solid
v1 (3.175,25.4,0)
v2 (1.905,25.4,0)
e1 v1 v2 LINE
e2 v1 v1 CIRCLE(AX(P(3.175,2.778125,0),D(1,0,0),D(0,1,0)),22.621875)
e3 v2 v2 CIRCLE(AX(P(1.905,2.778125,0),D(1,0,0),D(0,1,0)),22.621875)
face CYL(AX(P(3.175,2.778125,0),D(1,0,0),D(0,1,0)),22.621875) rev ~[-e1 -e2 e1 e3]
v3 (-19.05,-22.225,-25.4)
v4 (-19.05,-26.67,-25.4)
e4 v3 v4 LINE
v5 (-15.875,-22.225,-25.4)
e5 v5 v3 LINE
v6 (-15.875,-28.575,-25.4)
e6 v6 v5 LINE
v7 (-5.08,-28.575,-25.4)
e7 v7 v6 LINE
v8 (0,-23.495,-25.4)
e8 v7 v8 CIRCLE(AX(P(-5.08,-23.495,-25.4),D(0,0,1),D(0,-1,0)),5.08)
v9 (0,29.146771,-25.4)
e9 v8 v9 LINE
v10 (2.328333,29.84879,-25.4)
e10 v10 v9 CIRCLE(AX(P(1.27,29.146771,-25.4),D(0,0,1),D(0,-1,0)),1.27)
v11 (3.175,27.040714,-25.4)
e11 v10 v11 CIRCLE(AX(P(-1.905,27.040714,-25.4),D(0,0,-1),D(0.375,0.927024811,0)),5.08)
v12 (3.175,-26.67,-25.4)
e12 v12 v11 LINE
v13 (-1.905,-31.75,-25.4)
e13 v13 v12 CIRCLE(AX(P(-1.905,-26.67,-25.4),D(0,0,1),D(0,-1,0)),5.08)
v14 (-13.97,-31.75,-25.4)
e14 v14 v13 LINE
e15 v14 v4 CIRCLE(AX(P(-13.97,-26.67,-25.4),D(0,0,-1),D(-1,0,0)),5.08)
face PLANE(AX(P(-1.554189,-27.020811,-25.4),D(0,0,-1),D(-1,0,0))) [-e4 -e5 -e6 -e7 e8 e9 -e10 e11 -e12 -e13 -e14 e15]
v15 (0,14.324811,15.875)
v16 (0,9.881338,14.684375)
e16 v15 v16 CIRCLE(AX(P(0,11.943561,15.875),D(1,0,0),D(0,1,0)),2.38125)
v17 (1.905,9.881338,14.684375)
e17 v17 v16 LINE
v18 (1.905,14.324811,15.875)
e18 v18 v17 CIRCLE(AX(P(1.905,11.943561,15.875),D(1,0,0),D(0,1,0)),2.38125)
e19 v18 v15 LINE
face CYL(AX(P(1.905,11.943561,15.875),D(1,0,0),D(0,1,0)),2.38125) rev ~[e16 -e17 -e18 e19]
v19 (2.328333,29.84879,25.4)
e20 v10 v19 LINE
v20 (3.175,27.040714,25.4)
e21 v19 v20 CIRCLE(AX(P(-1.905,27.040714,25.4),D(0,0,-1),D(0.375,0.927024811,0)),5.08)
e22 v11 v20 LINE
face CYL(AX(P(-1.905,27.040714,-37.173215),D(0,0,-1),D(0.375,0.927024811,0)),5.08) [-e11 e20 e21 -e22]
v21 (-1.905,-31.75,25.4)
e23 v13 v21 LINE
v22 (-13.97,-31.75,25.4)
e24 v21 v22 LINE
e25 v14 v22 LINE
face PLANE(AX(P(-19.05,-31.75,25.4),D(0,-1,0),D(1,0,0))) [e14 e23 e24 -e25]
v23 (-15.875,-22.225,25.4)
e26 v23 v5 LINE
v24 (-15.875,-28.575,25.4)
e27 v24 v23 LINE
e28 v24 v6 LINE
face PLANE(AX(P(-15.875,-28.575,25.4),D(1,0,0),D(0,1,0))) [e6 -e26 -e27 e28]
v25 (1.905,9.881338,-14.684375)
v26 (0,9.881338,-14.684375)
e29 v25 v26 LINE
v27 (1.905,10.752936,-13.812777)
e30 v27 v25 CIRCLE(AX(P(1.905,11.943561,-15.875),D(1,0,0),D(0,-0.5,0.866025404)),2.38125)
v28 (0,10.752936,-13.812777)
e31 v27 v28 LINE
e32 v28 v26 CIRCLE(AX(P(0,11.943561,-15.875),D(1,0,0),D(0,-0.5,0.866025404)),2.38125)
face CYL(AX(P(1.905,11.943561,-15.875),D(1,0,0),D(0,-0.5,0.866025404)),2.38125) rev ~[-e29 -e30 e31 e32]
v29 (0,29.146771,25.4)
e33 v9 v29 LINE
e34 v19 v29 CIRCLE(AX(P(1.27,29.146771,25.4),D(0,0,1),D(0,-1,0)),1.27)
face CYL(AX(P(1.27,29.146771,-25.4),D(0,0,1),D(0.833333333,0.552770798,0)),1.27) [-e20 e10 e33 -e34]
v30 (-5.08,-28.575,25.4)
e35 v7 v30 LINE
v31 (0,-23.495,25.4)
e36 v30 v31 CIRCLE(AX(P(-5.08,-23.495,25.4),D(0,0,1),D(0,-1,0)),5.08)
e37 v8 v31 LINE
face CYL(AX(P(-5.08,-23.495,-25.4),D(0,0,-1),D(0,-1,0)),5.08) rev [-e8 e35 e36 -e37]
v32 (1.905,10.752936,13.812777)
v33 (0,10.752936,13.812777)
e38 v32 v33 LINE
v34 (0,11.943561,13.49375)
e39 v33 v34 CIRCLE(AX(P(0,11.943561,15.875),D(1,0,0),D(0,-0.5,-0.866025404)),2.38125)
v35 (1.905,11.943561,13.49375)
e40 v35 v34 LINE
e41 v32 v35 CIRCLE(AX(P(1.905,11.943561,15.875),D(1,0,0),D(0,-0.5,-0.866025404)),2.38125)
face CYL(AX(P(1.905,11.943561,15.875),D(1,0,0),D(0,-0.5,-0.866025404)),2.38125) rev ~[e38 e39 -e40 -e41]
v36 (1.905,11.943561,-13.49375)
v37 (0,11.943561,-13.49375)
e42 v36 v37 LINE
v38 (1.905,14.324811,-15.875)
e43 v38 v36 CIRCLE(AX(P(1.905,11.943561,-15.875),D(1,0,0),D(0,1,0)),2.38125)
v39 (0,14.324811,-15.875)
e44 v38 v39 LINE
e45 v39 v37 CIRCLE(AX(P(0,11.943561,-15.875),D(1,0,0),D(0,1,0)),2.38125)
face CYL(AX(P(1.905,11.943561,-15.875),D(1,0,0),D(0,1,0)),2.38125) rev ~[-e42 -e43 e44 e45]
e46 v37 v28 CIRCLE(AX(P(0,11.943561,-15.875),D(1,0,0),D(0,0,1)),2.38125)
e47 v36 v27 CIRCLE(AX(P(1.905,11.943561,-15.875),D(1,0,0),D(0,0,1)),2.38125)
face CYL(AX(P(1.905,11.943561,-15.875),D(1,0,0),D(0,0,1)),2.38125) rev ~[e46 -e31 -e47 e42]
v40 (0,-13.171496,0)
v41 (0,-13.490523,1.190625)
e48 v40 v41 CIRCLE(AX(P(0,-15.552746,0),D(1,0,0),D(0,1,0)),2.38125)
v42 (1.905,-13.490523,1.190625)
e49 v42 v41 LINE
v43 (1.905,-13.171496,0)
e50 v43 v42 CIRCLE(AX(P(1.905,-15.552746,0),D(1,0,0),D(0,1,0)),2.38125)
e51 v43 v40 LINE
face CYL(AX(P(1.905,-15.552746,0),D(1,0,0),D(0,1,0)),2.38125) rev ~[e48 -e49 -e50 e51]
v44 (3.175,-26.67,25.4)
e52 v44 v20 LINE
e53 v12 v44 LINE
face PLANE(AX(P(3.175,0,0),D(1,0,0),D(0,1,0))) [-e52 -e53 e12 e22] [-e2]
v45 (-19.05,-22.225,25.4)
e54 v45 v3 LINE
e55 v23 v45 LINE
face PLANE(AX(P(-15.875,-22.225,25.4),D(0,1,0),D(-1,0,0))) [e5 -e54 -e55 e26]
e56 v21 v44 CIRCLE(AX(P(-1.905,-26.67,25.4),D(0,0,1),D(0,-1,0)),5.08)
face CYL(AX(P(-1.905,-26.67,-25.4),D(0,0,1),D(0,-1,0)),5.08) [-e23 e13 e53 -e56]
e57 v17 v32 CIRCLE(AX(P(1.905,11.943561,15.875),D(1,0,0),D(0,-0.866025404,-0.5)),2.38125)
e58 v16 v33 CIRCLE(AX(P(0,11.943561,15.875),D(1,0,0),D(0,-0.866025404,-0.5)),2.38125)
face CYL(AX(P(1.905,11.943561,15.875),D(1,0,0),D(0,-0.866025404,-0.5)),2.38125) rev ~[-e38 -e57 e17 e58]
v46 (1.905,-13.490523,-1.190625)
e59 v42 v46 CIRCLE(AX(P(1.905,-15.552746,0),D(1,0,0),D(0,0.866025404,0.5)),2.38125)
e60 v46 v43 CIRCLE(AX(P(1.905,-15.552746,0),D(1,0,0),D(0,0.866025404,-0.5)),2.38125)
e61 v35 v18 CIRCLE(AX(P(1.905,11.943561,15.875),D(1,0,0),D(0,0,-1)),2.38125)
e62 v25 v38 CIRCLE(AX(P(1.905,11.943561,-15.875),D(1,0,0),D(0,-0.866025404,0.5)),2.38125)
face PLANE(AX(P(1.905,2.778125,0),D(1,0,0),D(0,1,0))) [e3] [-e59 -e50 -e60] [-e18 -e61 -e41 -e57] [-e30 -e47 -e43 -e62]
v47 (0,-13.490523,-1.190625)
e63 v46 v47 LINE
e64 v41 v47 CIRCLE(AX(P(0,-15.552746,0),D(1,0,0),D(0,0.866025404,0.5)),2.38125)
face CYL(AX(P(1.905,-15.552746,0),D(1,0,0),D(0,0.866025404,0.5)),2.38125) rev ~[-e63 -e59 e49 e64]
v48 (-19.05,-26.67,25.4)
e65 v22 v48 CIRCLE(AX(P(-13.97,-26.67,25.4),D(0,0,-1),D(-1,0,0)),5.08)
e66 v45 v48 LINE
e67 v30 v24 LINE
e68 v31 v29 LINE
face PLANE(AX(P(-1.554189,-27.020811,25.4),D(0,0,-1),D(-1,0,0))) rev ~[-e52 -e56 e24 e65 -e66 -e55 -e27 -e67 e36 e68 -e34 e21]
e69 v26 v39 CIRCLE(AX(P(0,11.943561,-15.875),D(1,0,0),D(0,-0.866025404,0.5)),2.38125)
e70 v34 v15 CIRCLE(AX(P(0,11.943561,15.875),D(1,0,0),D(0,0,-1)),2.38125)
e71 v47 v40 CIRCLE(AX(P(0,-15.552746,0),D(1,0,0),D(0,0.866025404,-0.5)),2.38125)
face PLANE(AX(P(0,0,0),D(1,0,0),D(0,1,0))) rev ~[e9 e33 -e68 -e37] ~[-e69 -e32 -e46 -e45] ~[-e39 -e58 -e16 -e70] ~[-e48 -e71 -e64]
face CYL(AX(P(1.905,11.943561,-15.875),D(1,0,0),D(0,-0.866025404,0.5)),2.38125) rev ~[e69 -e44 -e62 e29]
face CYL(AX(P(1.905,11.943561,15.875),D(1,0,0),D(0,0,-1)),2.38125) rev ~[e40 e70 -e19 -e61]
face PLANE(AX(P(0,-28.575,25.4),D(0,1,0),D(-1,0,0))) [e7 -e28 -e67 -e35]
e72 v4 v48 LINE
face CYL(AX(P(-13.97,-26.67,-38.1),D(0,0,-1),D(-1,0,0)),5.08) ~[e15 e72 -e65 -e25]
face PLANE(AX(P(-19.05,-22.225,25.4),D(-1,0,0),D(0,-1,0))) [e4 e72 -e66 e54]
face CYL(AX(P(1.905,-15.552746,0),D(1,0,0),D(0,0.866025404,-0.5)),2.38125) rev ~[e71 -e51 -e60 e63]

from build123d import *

# Parameters (mm, degrees)
F0_W        = 63.5
F0_H        = 50.8
F1_DEPTH    = 3.175
F2_R        = 22.621875
F3_DEPTH    = 1.27
F5_DEPTH    = 25.4
F7_DEPTH    = 50.8
F8_T1_DEPTH = 50.8
F8_T3_DEPTH = 74.3464301965
F8_T5_DEPTH = 76.2
F9_R        = 5.08
F10_R       = 1.27


# Not quite as in the source:
# - a fillet or chamfer that OpenCascade refuses, or shapes differently, is made with other operations: its cross-section is extruded or revolved along the edge and cut away or added


with BuildPart() as f1:
    # F0 (on Right) → F1 (new body)
    with BuildSketch(Plane.YZ):
        Rectangle(F0_W, F0_H)
    extrude(amount=F1_DEPTH)

    # F2 (on face) → F3 (cut)
    with BuildSketch(Plane.YZ.offset(3.175)):
        with Locations((2.778125, 0)):
            Circle(F2_R)
    extrude(amount=-F3_DEPTH, mode=Mode.SUBTRACT)

    # F4 (on face) → F5 (cut)
    with BuildSketch(Plane.YZ.offset(1.905)):
        with BuildLine():
            ThreePointArc((14.3248105234, 15.875), (11.3272476722, 18.1751108739), (9.8813375306, 14.684375))
            Line((9.8813375306, 14.684375), (11.9435605234, 15.875))
            Line((11.9435605234, 15.875), (11.9435605234, 13.49375))
            ThreePointArc((11.9435605234, 13.49375), (13.6273585461, 14.1912019773), (14.3248105234, 15.875))
        make_face()
        with BuildLine():
            Line((-15.5527460468, 0), (-13.490523054, 1.190625))
            ThreePointArc((-13.490523054, 1.190625), (-17.9339960468, 0), (-13.490523054, -1.190625))
            Line((-13.490523054, -1.190625), (-15.5527460468, 0))
        make_face()
        with BuildLine():
            ThreePointArc((-13.490523054, -1.190625), (-13.2526351729, -0.6163128512), (-13.1714960468, 0))
            Line((-13.1714960468, 0), (-15.5527460468, 0))
            Line((-15.5527460468, 0), (-13.490523054, -1.190625))
        make_face()
        with BuildLine():
            Line((-15.5527460468, 0), (-13.1714960468, 0))
            ThreePointArc((-13.1714960468, 0), (-13.2526351729, 0.6163128512), (-13.490523054, 1.190625))
            Line((-13.490523054, 1.190625), (-15.5527460468, 0))
        make_face()
        with BuildLine():
            ThreePointArc((10.7529355234, -13.8127770072), (10.2597625007, -14.1912019773), (9.8813375306, -14.684375))
            Line((9.8813375306, -14.684375), (11.9435605234, -15.875))
            Line((11.9435605234, -15.875), (10.7529355234, -13.8127770072))
        make_face()
        with BuildLine():
            Line((11.9435605234, 15.875), (10.7529355234, 13.8127770072))
            ThreePointArc((10.7529355234, 13.8127770072), (11.3272476722, 13.5748891261), (11.9435605234, 13.49375))
            Line((11.9435605234, 13.49375), (11.9435605234, 15.875))
        make_face()
        with BuildLine():
            Line((11.9435605234, 15.875), (9.8813375306, 14.684375))
            ThreePointArc((9.8813375306, 14.684375), (10.2597625007, 14.1912019773), (10.7529355234, 13.8127770072))
            Line((10.7529355234, 13.8127770072), (11.9435605234, 15.875))
        make_face()
        with BuildLine():
            Line((11.9435605234, -15.875), (9.8813375306, -14.684375))
            ThreePointArc((9.8813375306, -14.684375), (11.3272476722, -18.1751108739), (14.3248105234, -15.875))
            ThreePointArc((14.3248105234, -15.875), (13.6273585461, -14.1912019773), (11.9435605234, -13.49375))
            Line((11.9435605234, -13.49375), (11.9435605234, -15.875))
        make_face()
        with BuildLine():
            ThreePointArc((11.9435605234, -13.49375), (11.3272476722, -13.5748891261), (10.7529355234, -13.8127770072))
            Line((10.7529355234, -13.8127770072), (11.9435605234, -15.875))
            Line((11.9435605234, -15.875), (11.9435605234, -13.49375))
        make_face()
    extrude(amount=-F5_DEPTH, mode=Mode.SUBTRACT)

    # F6 (on face) → F7 (join, through all)
    with BuildSketch(Plane.XY.offset(25.4)):
        Polygon((-19.05, -31.75), (0, -31.75), (0, -28.575), (-15.875, -28.575), (-15.875, -22.225), (-19.05, -22.225), align=None)
    extrude(amount=-F7_DEPTH)

    # F8: fillet of radius 5.08 on 3 edges, made by hand

    # F8_s2 → F8_t1 (join)
    with BuildSketch(Plane.XY.offset(-25.4)):
        with BuildLine():
            ThreePointArc((-5.08, -28.575), (-1.4878975516, -27.0871024484), (0, -23.495))
            Line((0, -23.495), (0, -28.575))
            Line((0, -28.575), (-5.08, -28.575))
        make_face()
    extrude(amount=F8_T1_DEPTH)

    # F8_s4 → F8_t3 (cut)
    with BuildSketch(Plane.XY.offset(-37.1732150983)):
        with BuildLine():
            ThreePointArc((0, 31.75), (2.3071134838, 29.8805202921), (3.175, 27.0407139607))
            Line((3.175, 27.0407139607), (3.175, 31.75))
            Line((3.175, 31.75), (0, 31.75))
        make_face()
    extrude(amount=F8_T3_DEPTH, mode=Mode.SUBTRACT)

    # F8_s6 → F8_t5 (cut)
    with BuildSketch(Plane.XY.offset(-38.1)):
        with BuildLine():
            ThreePointArc((-19.05, -26.67), (-17.5621024484, -30.2621024484), (-13.97, -31.75))
            Line((-13.97, -31.75), (-19.05, -31.75))
            Line((-19.05, -31.75), (-19.05, -26.67))
        make_face()
    extrude(amount=F8_T5_DEPTH, mode=Mode.SUBTRACT)

    # F9
    f9_edges = [f1.edges().sort_by_distance(p)[0] for p in [
        (3.175, -31.75, 0),
    ]]
    fillet(f9_edges, radius=F9_R)

    # F10
    f10_edges = [f1.edges().sort_by_distance(p)[0] for p in [
        (0, 31.75, 0),
    ]]
    fillet(f10_edges, radius=F10_R)


solid = f1.part
